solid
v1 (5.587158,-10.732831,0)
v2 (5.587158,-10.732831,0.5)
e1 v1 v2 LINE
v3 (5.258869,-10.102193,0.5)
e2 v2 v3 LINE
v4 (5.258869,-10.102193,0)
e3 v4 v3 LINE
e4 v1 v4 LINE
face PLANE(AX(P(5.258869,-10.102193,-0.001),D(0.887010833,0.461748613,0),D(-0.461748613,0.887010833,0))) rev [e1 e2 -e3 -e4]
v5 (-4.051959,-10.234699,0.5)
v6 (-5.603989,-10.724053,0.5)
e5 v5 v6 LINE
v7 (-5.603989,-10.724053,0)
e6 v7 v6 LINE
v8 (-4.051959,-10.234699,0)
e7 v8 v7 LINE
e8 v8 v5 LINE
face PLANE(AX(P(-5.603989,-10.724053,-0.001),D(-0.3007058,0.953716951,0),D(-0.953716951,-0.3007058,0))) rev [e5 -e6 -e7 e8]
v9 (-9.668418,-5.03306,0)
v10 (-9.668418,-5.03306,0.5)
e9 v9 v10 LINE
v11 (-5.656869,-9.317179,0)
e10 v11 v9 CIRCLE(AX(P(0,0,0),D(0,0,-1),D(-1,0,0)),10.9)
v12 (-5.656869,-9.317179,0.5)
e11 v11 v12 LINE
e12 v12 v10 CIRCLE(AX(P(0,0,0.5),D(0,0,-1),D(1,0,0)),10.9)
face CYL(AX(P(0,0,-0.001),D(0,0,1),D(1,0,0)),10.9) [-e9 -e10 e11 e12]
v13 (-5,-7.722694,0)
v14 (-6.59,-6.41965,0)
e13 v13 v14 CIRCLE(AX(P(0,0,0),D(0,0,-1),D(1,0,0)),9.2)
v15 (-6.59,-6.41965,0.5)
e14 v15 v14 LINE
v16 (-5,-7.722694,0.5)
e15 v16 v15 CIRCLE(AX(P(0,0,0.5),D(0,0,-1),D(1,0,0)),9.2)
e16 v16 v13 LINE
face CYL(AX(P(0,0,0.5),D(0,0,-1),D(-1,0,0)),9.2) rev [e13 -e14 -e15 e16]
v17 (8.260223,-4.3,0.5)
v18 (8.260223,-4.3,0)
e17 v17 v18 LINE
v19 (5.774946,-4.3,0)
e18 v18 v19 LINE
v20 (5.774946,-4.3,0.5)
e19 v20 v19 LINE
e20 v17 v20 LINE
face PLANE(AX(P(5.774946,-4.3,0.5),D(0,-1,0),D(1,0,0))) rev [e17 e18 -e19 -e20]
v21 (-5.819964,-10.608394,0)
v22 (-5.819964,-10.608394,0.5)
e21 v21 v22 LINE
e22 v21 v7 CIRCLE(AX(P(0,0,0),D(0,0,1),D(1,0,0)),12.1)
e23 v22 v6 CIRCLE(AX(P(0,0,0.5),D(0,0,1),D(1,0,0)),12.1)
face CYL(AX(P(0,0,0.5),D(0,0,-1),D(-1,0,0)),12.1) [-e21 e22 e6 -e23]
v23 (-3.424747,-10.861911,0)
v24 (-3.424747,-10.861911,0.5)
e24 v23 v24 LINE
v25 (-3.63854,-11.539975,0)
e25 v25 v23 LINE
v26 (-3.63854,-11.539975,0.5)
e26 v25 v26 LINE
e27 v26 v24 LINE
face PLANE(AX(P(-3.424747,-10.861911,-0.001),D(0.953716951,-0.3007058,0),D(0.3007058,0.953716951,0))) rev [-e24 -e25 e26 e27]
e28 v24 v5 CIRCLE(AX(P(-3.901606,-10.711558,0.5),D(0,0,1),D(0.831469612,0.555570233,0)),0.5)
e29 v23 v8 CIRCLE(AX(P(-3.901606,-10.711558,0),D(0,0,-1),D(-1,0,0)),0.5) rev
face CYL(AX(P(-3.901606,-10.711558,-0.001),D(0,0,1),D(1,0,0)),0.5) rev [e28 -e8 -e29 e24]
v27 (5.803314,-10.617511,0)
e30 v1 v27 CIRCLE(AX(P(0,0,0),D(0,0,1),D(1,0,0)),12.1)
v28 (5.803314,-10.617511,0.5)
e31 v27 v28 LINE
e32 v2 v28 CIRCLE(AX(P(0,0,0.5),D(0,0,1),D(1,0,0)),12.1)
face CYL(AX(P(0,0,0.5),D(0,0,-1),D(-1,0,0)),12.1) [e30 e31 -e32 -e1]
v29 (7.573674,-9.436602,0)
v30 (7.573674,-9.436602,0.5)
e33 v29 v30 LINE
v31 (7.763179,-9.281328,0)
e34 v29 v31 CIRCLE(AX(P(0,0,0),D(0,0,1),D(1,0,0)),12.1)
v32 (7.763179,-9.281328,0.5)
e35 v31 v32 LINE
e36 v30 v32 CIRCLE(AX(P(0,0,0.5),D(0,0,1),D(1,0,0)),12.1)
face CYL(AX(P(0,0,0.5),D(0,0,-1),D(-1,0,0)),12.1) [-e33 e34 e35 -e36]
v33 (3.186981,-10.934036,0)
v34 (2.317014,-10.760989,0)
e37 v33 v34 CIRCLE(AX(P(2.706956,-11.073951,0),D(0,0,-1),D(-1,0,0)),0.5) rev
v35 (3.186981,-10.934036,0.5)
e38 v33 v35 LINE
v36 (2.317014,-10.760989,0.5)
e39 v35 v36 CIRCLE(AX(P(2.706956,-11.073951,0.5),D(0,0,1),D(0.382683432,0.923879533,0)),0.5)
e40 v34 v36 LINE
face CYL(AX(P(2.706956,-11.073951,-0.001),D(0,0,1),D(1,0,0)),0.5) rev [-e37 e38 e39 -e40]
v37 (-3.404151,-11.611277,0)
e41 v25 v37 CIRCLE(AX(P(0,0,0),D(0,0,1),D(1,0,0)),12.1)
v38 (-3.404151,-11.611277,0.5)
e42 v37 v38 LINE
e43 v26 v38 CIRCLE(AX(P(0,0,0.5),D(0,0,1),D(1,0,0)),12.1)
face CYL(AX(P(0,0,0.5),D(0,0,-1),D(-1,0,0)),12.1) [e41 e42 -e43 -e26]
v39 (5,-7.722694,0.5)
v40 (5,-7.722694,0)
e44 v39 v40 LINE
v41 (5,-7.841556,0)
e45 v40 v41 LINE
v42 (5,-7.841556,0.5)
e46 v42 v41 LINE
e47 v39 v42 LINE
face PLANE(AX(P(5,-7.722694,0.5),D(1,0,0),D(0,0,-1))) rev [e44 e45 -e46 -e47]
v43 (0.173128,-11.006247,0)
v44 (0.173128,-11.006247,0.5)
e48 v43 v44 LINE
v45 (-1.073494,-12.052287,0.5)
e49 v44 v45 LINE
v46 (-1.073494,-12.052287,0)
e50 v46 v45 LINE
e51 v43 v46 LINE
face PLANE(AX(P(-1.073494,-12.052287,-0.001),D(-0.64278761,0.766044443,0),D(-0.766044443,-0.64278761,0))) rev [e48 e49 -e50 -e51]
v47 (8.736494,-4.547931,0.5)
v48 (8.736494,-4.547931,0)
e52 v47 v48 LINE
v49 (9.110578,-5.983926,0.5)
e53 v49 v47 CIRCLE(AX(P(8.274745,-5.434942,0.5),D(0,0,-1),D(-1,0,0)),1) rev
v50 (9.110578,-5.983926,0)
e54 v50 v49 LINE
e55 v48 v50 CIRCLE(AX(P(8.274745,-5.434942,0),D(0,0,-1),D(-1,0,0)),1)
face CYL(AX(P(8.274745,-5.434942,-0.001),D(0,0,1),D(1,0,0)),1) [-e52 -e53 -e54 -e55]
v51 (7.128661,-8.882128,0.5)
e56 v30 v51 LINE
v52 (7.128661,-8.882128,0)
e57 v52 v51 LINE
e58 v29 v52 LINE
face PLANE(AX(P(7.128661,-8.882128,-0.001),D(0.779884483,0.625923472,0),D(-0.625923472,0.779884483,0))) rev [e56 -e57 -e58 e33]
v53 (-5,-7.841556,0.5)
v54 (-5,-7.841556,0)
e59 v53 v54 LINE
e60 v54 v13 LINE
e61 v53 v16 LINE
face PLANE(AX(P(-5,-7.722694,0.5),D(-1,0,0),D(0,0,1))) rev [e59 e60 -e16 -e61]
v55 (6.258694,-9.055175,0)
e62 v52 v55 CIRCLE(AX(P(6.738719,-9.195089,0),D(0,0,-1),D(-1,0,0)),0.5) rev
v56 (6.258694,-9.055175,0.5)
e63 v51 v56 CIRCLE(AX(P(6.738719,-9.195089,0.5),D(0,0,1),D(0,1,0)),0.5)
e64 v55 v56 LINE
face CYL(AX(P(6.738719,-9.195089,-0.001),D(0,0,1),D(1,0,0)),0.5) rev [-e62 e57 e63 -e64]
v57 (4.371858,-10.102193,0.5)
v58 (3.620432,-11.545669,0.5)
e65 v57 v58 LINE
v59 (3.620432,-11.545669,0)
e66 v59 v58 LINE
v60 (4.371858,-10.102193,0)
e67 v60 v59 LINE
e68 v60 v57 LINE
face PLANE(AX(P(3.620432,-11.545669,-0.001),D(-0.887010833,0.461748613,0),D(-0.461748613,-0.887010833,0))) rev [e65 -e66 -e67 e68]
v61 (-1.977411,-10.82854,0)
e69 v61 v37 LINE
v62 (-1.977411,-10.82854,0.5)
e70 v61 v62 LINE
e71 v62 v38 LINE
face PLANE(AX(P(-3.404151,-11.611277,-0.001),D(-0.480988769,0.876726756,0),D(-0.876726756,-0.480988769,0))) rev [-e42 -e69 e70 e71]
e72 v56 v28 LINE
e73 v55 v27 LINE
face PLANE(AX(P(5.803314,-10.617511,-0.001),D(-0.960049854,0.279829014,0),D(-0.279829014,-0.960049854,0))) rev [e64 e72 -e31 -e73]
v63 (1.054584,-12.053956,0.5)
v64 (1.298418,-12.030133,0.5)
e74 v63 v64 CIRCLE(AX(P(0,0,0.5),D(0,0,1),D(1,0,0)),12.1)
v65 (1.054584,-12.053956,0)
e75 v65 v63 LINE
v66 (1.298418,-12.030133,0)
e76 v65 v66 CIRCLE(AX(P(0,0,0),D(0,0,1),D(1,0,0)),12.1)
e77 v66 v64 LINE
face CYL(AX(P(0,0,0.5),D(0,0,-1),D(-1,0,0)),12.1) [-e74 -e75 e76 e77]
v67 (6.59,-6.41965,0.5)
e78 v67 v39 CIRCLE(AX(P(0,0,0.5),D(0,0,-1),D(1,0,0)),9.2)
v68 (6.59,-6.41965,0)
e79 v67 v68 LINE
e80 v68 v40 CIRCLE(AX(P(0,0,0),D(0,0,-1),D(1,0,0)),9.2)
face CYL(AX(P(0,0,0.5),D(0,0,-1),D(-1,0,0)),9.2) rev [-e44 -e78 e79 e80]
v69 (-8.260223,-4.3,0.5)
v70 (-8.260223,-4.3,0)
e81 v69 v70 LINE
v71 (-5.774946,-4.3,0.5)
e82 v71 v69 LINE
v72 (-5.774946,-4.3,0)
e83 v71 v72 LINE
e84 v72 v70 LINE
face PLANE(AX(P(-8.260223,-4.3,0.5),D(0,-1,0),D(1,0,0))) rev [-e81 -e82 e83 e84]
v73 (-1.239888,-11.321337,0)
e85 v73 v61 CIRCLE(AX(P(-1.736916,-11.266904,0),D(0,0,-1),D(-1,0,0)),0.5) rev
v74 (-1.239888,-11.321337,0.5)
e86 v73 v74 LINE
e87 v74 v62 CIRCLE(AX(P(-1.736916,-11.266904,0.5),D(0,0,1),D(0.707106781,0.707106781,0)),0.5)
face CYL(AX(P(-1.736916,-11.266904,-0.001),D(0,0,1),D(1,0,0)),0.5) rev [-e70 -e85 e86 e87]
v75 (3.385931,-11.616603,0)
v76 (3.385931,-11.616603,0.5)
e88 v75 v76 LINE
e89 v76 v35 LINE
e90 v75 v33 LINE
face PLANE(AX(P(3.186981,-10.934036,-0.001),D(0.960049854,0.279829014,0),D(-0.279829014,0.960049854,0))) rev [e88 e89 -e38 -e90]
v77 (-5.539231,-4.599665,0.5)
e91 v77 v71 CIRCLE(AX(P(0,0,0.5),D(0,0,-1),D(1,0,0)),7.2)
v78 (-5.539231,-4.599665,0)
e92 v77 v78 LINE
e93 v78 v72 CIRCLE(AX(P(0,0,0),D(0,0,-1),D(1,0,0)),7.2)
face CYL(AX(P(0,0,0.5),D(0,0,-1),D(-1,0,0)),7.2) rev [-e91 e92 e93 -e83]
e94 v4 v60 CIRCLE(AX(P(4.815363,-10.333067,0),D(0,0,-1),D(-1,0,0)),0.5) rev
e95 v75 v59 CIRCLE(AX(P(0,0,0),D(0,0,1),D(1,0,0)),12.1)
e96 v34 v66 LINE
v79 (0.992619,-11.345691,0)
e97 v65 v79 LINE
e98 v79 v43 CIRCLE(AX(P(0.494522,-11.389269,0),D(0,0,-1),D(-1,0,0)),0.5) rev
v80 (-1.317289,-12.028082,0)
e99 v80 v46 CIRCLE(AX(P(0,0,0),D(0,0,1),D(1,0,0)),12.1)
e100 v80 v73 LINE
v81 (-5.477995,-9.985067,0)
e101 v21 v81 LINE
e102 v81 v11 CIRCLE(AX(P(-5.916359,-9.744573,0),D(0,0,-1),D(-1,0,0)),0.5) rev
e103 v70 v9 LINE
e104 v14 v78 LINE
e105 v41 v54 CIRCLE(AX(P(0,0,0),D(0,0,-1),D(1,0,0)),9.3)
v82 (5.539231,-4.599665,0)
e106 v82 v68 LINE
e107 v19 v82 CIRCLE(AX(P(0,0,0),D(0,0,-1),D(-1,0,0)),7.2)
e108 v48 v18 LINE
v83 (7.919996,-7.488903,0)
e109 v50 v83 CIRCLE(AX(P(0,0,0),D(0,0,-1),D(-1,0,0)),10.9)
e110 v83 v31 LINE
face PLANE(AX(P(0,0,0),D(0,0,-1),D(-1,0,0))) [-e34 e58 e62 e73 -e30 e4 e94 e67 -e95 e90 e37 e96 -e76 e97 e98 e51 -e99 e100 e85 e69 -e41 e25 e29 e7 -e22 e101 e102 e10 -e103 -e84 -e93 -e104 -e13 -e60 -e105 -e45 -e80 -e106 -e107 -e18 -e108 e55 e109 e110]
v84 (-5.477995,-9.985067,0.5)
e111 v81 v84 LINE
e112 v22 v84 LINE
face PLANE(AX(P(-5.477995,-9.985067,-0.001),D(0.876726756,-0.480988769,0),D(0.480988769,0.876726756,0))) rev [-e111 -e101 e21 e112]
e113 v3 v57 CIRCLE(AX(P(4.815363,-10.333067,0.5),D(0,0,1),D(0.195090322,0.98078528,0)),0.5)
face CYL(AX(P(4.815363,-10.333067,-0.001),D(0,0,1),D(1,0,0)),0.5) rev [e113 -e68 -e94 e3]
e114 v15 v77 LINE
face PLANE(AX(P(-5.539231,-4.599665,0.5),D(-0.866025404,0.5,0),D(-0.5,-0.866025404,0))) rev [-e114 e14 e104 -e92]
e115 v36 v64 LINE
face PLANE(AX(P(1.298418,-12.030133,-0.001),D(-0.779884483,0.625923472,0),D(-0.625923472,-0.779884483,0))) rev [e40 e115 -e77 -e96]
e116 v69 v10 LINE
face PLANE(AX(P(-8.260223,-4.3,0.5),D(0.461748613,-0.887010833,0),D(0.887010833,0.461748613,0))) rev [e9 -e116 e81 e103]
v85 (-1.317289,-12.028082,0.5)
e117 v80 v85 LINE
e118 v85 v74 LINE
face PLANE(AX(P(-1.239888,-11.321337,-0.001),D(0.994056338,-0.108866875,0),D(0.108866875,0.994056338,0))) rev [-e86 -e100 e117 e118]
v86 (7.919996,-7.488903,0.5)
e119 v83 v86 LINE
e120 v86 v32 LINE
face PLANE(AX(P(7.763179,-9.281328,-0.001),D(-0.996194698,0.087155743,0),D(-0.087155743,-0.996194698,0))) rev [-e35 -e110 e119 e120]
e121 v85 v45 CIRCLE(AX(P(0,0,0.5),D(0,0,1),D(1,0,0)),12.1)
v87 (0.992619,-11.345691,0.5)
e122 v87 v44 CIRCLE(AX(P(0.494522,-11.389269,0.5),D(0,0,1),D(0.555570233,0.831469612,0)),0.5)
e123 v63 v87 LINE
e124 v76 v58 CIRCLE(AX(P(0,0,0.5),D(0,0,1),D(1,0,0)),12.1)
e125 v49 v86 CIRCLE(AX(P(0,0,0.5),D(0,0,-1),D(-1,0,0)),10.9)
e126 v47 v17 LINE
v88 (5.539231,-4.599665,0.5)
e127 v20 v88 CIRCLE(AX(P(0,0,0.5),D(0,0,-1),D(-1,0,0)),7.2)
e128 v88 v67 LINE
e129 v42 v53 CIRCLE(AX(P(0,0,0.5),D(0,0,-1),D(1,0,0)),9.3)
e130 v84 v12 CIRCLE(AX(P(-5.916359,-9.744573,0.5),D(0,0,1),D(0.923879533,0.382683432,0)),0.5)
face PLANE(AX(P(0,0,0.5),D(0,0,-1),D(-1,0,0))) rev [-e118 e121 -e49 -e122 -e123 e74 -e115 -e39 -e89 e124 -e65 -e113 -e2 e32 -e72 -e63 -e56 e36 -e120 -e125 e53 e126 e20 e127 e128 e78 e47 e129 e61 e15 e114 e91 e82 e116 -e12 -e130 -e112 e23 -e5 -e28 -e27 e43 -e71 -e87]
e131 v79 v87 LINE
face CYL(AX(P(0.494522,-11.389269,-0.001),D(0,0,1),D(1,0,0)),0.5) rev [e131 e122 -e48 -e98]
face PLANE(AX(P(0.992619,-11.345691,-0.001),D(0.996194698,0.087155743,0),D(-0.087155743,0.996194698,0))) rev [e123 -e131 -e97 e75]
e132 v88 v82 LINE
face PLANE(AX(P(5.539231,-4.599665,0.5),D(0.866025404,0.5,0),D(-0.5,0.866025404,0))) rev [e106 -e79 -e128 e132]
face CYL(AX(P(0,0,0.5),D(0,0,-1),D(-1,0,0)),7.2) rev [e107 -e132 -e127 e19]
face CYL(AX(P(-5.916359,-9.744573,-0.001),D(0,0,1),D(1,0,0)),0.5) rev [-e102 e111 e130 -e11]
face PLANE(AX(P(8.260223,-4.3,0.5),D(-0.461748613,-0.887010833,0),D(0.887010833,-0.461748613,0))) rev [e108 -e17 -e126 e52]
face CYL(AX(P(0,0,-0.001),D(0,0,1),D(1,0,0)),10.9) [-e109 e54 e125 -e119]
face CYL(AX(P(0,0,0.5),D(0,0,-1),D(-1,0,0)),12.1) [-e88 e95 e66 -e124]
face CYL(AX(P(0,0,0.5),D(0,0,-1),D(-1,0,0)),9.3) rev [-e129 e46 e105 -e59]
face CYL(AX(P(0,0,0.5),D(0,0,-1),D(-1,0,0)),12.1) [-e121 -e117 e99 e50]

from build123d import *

# Parameters (mm, degrees)
OTHER_10076_5_DEPTH = 0.5
CUT_EXTRUDE1_START  = -0.5
CUT_EXTRUDE1_DEPTH  = 0.5


# Read off the part's stored shape, not the designer's step: 10076-5
with BuildPart() as part:
    # Other 10076-5 outline → Other 10076-5 (new body)
    with BuildSketch(Plane.XY):
        with BuildLine():
            ThreePointArc((7.573674013, -9.436602245), (7.668819519, -9.359444812), (7.763179028, -9.281328104))
            Line((7.763179028, -9.281328104), (7.919995926, -7.488902759))
            ThreePointArc((7.919995926, -7.488902759), (8.548470738, -6.76266575), (9.110578105, -5.983925684))
            ThreePointArc((9.110578105, -5.983925684), (9.242448569, -5.182849851), (8.736493865, -4.547930843))
            Line((8.736493865, -4.547930843), (8.260223146, -4.3))
            Line((8.260223146, -4.3), (5.774945887, -4.3))
            ThreePointArc((5.774945887, -4.3), (5.659072475, -4.451392897), (5.53923133, -4.5996648))
            Line((5.53923133, -4.5996648), (6.59, -6.419649523))
            ThreePointArc((6.59, -6.419649523), (5.831509763, -7.1157216), (5, -7.722693831))
            Line((5, -7.722693831), (5, -7.841555968))
            ThreePointArc((5, -7.841555968), (0, -9.3), (-5, -7.841555968))
            Line((-5, -7.841555968), (-5, -7.722693831))
            ThreePointArc((-5, -7.722693831), (-5.831509763, -7.1157216), (-6.59, -6.419649523))
            Line((-6.59, -6.419649523), (-5.53923133, -4.5996648))
            ThreePointArc((-5.53923133, -4.5996648), (-5.659072475, -4.451392897), (-5.774945887, -4.3))
            Line((-5.774945887, -4.3), (-8.260223146, -4.3))
            Line((-8.260223146, -4.3), (-10.732831081, -5.58715822))
            ThreePointArc((-10.732831081, -5.58715822), (-10.675718173, -5.6955282), (-10.617511084, -5.803314431))
            Line((-10.617511084, -5.803314431), (-9.055174855, -6.258693914))
            ThreePointArc((-9.055174855, -6.258693914), (-8.704696722, -6.64117368), (-8.882127626, -7.128661083))
            Line((-8.882127626, -7.128661083), (-9.436602245, -7.573674013))
            ThreePointArc((-9.436602245, -7.573674013), (-9.359444812, -7.668819519), (-9.281328104, -7.763179028))
            Line((-9.281328104, -7.763179028), (-7.660171598, -7.905011844))
            ThreePointArc((-7.660171598, -7.905011844), (-7.241809703, -8.211767477), (-7.320727248, -8.724502998))
            Line((-7.320727248, -8.724502998), (-7.777730077, -9.269137762))
            ThreePointArc((-7.777730077, -9.269137762), (-7.683493234, -9.347402405), (-7.588468891, -9.424709008))
            Line((-7.588468891, -9.424709008), (-5.970792243, -9.247544602))
            ThreePointArc((-5.970792243, -9.247544602), (-5.500623999, -9.466787654), (-5.477995427, -9.985067155))
            Line((-5.477995427, -9.985067155), (-5.819964104, -10.608393744))
            ThreePointArc((-5.819964104, -10.608393744), (-5.712269322, -10.666769858), (-5.603989074, -10.724052707))
            Line((-5.603989074, -10.724052707), (-4.05195869, -10.234699407))
            ThreePointArc((-4.05195869, -10.234699407), (-3.548052399, -10.358004491), (-3.424747314, -10.861910782))
            Line((-3.424747314, -10.861910782), (-3.638540174, -11.539975104))
            ThreePointArc((-3.638540174, -11.539975104), (-3.521526102, -11.576219327), (-3.404151099, -11.611277074))
            Line((-3.404151099, -11.611277074), (-1.977410637, -10.828540453))
            ThreePointArc((-1.977410637, -10.828540453), (-1.459131136, -10.851169025), (-1.239888083, -11.321337268))
            Line((-1.239888083, -11.321337268), (-1.317289186, -12.028081692))
            ThreePointArc((-1.317289186, -12.028081692), (-1.195452609, -12.04080118), (-1.073493507, -12.052286575))
            Line((-1.073493507, -12.052286575), (0.173128198, -11.006246762))
            ThreePointArc((0.173128198, -11.006246762), (0.685863719, -10.927329218), (0.992619352, -11.345691113))
            Line((0.992619352, -11.345691113), (1.054584487, -12.053955847))
            ThreePointArc((1.054584487, -12.053955847), (1.176561457, -12.042661796), (1.298417839, -12.030133462))
            Line((1.298417839, -12.030133462), (2.317013814, -10.760989181))
            ThreePointArc((2.317013814, -10.760989181), (2.804501216, -10.583558277), (3.186980982, -10.93403641))
            Line((3.186980982, -10.93403641), (3.38593107, -11.616603238))
            ThreePointArc((3.38593107, -11.616603238), (3.503360927, -11.581729673), (3.620431715, -11.545669067))
            Line((3.620431715, -11.545669067), (4.371857887, -10.10219282))
            ThreePointArc((4.371857887, -10.10219282), (4.815363304, -9.833067127), (5.258868721, -10.10219282))
            Line((5.258868721, -10.10219282), (5.58715822, -10.732831081))
            ThreePointArc((5.58715822, -10.732831081), (5.6955282, -10.675718173), (5.803314431, -10.617511084))
            Line((5.803314431, -10.617511084), (6.258693914, -9.055174855))
            ThreePointArc((6.258693914, -9.055174855), (6.64117368, -8.704696722), (7.128661083, -8.882127626))
            Line((7.128661083, -8.882127626), (7.573674013, -9.436602245))
        make_face()
    extrude(amount=OTHER_10076_5_DEPTH)

    # Sketch1 → Cut-Extrude1 (cut)
    with BuildSketch(Plane.XY.offset(0.5).offset(CUT_EXTRUDE1_START)):
        with BuildLine():
            Line((-9.668418082, -5.033059884), (-10.732831081, -5.58715822))
            ThreePointArc((-10.732831081, -5.58715822), (-9.359444812, -7.668819519), (-7.588468891, -9.424709008))
            Line((-7.588468891, -9.424709008), (-5.970792243, -9.247544602))
            ThreePointArc((-5.970792243, -9.247544602), (-5.808080301, -9.256437784), (-5.656869384, -9.317179228))
            ThreePointArc((-5.656869384, -9.317179228), (-7.956414306, -7.450199419), (-9.668418082, -5.033059884))
        make_face()
    extrude(amount=CUT_EXTRUDE1_DEPTH, mode=Mode.SUBTRACT)


solid = part.part
